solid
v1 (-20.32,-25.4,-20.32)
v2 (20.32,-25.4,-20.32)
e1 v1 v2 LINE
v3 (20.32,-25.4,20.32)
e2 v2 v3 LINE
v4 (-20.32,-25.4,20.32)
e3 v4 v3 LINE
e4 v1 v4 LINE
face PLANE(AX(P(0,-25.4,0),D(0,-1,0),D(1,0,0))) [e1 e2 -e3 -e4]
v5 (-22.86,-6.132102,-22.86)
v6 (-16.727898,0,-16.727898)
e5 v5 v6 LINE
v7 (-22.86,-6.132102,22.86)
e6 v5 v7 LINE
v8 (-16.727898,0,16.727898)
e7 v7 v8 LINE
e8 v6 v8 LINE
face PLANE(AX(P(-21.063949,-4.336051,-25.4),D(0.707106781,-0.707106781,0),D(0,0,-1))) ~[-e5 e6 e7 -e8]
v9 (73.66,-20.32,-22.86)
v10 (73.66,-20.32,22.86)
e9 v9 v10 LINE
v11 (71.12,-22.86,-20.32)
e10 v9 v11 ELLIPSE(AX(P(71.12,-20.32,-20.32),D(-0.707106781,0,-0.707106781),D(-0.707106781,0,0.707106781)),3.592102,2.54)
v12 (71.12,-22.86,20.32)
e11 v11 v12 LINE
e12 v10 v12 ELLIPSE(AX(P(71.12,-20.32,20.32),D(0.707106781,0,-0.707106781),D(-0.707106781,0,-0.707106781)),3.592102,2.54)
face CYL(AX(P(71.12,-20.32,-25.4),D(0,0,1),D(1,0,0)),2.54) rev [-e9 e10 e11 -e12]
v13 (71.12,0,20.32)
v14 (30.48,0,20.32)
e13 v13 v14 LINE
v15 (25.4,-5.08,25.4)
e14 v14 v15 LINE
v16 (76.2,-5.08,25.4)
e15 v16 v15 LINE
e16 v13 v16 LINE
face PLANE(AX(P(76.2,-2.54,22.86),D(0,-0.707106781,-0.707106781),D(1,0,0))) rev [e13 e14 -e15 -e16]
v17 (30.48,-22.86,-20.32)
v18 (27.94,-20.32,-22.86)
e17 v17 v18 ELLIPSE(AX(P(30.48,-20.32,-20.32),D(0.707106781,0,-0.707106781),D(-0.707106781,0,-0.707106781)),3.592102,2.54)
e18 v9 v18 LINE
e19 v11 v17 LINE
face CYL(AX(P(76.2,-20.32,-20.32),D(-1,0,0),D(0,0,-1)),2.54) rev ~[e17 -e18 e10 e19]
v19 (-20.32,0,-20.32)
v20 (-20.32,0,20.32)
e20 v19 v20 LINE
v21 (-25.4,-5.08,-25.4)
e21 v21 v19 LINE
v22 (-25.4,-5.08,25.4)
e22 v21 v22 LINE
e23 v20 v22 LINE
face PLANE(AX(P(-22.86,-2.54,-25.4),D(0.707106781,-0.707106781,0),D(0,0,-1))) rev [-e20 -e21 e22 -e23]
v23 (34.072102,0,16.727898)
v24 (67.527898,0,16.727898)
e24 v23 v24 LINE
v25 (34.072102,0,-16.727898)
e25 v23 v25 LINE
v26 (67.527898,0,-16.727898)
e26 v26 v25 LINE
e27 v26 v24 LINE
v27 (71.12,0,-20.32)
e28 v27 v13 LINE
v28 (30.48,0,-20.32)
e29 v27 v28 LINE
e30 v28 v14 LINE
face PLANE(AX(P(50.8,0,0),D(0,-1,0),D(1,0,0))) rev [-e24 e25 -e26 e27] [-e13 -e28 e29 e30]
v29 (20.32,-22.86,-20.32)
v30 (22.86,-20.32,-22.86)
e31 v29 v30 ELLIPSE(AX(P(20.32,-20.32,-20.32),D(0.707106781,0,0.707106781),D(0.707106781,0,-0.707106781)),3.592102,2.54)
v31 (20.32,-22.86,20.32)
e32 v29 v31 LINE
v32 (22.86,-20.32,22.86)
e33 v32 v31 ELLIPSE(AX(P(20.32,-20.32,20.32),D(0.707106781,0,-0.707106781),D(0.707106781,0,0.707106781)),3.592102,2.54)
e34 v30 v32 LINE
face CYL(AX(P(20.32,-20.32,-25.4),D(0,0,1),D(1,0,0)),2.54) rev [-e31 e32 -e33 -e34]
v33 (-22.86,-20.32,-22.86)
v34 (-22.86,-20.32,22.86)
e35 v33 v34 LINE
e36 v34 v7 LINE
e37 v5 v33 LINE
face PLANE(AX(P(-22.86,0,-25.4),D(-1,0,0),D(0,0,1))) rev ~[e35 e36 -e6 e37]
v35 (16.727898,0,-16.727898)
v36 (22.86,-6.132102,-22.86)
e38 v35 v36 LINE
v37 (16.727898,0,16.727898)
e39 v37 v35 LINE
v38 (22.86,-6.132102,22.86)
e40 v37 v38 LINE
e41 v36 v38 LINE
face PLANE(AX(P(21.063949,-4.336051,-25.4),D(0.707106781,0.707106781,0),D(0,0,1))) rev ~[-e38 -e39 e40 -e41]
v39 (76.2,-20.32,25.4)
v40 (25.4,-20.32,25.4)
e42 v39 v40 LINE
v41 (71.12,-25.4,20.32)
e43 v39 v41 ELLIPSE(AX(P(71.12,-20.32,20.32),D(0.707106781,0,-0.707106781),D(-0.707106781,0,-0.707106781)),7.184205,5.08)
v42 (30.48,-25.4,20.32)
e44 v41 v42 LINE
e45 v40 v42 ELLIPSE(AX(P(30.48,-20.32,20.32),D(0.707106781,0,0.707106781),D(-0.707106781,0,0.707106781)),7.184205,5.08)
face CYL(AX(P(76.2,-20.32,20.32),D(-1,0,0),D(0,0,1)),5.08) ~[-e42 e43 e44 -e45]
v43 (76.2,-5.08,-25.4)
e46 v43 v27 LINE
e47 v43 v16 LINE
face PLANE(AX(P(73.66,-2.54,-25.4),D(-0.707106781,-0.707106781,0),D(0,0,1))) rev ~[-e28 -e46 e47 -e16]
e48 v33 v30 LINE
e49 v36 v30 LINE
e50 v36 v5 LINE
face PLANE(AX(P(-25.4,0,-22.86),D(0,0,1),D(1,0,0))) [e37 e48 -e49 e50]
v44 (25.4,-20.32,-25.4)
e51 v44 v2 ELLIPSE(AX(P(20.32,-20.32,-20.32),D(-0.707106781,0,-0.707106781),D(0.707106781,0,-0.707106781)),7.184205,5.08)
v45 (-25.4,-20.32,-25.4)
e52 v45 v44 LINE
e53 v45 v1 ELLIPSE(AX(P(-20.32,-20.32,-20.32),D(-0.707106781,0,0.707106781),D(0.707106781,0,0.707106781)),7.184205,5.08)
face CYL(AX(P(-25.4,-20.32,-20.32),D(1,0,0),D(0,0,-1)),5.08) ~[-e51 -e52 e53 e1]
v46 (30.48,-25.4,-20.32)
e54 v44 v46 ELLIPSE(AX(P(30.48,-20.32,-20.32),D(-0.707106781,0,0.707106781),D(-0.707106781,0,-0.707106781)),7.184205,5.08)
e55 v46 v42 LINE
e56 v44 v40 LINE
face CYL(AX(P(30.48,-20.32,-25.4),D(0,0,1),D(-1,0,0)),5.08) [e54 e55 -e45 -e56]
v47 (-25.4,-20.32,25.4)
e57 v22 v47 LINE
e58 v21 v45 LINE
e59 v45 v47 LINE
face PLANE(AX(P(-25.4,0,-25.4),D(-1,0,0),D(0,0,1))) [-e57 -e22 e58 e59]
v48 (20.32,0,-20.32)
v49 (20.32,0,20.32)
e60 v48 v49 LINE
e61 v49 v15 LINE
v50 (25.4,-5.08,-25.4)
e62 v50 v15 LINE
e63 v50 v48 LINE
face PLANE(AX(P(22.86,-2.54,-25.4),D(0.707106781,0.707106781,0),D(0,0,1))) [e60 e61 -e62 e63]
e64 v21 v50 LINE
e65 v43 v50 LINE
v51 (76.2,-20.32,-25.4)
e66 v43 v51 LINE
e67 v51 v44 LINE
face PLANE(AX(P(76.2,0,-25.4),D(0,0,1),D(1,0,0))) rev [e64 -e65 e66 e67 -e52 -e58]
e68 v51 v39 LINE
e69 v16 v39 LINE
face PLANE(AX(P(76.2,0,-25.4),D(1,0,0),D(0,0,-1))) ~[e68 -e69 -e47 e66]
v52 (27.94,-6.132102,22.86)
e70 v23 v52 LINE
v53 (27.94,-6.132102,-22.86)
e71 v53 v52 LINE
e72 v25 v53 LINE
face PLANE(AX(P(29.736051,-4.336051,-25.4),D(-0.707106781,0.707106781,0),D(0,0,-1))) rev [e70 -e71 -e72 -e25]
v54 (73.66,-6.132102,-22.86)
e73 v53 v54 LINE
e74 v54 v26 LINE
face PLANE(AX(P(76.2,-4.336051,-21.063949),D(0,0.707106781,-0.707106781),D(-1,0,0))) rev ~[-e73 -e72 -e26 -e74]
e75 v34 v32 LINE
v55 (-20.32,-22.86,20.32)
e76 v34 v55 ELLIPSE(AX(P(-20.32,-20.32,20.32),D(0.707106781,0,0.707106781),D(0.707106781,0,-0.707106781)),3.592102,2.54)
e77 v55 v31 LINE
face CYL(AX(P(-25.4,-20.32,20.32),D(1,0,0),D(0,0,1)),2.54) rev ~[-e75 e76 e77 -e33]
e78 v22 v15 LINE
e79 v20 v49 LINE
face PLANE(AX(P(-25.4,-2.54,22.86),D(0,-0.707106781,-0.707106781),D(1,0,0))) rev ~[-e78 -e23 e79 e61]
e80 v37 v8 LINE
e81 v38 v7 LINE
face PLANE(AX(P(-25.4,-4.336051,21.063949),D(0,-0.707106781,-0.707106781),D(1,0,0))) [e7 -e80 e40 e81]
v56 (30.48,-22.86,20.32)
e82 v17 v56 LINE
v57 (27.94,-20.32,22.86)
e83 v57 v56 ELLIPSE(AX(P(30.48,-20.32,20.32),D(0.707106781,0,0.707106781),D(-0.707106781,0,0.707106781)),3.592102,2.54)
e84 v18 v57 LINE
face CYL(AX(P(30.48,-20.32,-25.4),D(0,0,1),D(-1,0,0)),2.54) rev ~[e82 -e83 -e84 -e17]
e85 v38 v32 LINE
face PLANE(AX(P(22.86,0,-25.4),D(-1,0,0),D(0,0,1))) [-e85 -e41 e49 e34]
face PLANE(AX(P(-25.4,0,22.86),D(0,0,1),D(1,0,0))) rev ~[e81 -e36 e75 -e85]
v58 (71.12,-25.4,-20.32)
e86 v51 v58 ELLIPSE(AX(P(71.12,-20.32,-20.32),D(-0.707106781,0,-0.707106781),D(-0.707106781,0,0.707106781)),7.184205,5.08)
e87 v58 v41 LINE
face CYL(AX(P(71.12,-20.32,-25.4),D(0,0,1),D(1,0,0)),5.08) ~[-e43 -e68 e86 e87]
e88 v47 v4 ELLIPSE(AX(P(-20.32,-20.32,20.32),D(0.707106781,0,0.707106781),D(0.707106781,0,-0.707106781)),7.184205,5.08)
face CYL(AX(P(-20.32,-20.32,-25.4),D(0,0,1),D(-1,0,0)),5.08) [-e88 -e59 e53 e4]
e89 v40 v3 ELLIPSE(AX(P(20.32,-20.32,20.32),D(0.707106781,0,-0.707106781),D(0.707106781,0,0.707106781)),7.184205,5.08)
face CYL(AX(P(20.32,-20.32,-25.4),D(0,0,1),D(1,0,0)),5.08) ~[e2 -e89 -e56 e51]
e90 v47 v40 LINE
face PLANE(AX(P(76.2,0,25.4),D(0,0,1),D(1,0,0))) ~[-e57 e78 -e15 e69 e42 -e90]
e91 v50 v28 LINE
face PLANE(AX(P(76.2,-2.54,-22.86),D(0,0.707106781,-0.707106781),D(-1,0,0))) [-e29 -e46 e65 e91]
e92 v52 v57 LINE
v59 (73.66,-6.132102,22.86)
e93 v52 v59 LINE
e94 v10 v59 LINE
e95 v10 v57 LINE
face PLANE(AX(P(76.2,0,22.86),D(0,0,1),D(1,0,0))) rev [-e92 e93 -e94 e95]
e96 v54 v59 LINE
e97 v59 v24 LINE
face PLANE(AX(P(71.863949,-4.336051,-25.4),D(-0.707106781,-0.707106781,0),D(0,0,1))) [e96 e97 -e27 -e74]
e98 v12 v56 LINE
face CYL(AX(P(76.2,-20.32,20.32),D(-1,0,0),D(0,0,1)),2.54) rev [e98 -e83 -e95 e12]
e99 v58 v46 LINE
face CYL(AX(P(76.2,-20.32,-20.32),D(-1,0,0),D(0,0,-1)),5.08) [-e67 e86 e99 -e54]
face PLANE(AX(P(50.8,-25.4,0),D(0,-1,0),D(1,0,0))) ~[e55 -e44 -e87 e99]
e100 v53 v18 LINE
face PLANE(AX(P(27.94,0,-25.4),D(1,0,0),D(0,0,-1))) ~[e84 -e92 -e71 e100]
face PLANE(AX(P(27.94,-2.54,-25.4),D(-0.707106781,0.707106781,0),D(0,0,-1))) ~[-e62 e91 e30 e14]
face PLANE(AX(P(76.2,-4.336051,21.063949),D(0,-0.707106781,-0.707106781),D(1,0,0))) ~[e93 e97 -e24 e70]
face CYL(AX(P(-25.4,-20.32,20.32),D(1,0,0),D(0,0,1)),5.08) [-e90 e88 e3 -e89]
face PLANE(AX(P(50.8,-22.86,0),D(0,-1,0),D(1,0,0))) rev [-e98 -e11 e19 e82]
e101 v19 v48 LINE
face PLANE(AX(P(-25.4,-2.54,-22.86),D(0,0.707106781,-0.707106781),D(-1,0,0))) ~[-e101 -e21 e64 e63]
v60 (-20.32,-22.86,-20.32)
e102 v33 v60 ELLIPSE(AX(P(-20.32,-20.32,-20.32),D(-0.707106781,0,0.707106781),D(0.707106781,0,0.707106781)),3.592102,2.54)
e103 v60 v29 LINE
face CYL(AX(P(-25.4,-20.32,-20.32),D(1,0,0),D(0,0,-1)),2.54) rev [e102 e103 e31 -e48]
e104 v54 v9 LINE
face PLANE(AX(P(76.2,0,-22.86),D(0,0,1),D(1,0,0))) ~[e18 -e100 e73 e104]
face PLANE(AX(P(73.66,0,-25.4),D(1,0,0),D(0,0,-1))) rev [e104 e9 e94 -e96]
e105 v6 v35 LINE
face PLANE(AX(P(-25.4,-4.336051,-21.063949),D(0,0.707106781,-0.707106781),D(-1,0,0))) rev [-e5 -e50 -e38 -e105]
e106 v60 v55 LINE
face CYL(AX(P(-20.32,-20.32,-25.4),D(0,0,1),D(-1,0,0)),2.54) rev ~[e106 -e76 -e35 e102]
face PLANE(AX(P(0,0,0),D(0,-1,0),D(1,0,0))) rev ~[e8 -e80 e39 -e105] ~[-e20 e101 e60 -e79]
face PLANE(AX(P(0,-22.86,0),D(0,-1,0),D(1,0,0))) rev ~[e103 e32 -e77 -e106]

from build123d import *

# Parameters (mm, degrees)
F0_W     = 50.8
F0_H     = 50.8
F1_DEPTH = 25.4
F3_R     = 5.08
F4_SIZE  = 5.08
F5_T     = -2.54


# Not quite as in the source:
# - a feature of the source that left no trace in its solid (it failed there, or was rolled back) is left out


with BuildPart() as f1:
    # F0 (on Front) → F1 (new body)
    with BuildSketch(Plane.XZ):
        Rectangle(F0_W, F0_H)
    extrude(amount=F1_DEPTH)

    # F3
    f3_edges = [f1.edges().sort_by_distance(p)[0] for p in [
        (0, -25.4, 25.4),
        (-25.4, -25.4, 0),
        (0, -25.4, -25.4),
        (25.4, -25.4, 0),
    ]]
    fillet(f3_edges, radius=F3_R)

    # F4
    f4_edges = [f1.edges().sort_by_distance(p)[0] for p in [
        (0, 0, 25.4),
        (-25.4, 0, 0),
        (0, 0, -25.4),
        (25.4, 0, 0),
    ]]
    chamfer(f4_edges, length=F4_SIZE)

    # F5
    f5_openings = [f1.faces().sort_by_distance(p)[0] for p in [
        (0, 0, 0),
    ]]
    offset(amount=F5_T, openings=f5_openings)

    # F6: F1 across face


with BuildPart() as f1_1:
    add(f1.part)
    add(f1.part.mirror(Plane(origin=(25.4, -12.7, 0), x_dir=(0, 1, 0), z_dir=(1, 0, 0))))


solid = f1_1.part
